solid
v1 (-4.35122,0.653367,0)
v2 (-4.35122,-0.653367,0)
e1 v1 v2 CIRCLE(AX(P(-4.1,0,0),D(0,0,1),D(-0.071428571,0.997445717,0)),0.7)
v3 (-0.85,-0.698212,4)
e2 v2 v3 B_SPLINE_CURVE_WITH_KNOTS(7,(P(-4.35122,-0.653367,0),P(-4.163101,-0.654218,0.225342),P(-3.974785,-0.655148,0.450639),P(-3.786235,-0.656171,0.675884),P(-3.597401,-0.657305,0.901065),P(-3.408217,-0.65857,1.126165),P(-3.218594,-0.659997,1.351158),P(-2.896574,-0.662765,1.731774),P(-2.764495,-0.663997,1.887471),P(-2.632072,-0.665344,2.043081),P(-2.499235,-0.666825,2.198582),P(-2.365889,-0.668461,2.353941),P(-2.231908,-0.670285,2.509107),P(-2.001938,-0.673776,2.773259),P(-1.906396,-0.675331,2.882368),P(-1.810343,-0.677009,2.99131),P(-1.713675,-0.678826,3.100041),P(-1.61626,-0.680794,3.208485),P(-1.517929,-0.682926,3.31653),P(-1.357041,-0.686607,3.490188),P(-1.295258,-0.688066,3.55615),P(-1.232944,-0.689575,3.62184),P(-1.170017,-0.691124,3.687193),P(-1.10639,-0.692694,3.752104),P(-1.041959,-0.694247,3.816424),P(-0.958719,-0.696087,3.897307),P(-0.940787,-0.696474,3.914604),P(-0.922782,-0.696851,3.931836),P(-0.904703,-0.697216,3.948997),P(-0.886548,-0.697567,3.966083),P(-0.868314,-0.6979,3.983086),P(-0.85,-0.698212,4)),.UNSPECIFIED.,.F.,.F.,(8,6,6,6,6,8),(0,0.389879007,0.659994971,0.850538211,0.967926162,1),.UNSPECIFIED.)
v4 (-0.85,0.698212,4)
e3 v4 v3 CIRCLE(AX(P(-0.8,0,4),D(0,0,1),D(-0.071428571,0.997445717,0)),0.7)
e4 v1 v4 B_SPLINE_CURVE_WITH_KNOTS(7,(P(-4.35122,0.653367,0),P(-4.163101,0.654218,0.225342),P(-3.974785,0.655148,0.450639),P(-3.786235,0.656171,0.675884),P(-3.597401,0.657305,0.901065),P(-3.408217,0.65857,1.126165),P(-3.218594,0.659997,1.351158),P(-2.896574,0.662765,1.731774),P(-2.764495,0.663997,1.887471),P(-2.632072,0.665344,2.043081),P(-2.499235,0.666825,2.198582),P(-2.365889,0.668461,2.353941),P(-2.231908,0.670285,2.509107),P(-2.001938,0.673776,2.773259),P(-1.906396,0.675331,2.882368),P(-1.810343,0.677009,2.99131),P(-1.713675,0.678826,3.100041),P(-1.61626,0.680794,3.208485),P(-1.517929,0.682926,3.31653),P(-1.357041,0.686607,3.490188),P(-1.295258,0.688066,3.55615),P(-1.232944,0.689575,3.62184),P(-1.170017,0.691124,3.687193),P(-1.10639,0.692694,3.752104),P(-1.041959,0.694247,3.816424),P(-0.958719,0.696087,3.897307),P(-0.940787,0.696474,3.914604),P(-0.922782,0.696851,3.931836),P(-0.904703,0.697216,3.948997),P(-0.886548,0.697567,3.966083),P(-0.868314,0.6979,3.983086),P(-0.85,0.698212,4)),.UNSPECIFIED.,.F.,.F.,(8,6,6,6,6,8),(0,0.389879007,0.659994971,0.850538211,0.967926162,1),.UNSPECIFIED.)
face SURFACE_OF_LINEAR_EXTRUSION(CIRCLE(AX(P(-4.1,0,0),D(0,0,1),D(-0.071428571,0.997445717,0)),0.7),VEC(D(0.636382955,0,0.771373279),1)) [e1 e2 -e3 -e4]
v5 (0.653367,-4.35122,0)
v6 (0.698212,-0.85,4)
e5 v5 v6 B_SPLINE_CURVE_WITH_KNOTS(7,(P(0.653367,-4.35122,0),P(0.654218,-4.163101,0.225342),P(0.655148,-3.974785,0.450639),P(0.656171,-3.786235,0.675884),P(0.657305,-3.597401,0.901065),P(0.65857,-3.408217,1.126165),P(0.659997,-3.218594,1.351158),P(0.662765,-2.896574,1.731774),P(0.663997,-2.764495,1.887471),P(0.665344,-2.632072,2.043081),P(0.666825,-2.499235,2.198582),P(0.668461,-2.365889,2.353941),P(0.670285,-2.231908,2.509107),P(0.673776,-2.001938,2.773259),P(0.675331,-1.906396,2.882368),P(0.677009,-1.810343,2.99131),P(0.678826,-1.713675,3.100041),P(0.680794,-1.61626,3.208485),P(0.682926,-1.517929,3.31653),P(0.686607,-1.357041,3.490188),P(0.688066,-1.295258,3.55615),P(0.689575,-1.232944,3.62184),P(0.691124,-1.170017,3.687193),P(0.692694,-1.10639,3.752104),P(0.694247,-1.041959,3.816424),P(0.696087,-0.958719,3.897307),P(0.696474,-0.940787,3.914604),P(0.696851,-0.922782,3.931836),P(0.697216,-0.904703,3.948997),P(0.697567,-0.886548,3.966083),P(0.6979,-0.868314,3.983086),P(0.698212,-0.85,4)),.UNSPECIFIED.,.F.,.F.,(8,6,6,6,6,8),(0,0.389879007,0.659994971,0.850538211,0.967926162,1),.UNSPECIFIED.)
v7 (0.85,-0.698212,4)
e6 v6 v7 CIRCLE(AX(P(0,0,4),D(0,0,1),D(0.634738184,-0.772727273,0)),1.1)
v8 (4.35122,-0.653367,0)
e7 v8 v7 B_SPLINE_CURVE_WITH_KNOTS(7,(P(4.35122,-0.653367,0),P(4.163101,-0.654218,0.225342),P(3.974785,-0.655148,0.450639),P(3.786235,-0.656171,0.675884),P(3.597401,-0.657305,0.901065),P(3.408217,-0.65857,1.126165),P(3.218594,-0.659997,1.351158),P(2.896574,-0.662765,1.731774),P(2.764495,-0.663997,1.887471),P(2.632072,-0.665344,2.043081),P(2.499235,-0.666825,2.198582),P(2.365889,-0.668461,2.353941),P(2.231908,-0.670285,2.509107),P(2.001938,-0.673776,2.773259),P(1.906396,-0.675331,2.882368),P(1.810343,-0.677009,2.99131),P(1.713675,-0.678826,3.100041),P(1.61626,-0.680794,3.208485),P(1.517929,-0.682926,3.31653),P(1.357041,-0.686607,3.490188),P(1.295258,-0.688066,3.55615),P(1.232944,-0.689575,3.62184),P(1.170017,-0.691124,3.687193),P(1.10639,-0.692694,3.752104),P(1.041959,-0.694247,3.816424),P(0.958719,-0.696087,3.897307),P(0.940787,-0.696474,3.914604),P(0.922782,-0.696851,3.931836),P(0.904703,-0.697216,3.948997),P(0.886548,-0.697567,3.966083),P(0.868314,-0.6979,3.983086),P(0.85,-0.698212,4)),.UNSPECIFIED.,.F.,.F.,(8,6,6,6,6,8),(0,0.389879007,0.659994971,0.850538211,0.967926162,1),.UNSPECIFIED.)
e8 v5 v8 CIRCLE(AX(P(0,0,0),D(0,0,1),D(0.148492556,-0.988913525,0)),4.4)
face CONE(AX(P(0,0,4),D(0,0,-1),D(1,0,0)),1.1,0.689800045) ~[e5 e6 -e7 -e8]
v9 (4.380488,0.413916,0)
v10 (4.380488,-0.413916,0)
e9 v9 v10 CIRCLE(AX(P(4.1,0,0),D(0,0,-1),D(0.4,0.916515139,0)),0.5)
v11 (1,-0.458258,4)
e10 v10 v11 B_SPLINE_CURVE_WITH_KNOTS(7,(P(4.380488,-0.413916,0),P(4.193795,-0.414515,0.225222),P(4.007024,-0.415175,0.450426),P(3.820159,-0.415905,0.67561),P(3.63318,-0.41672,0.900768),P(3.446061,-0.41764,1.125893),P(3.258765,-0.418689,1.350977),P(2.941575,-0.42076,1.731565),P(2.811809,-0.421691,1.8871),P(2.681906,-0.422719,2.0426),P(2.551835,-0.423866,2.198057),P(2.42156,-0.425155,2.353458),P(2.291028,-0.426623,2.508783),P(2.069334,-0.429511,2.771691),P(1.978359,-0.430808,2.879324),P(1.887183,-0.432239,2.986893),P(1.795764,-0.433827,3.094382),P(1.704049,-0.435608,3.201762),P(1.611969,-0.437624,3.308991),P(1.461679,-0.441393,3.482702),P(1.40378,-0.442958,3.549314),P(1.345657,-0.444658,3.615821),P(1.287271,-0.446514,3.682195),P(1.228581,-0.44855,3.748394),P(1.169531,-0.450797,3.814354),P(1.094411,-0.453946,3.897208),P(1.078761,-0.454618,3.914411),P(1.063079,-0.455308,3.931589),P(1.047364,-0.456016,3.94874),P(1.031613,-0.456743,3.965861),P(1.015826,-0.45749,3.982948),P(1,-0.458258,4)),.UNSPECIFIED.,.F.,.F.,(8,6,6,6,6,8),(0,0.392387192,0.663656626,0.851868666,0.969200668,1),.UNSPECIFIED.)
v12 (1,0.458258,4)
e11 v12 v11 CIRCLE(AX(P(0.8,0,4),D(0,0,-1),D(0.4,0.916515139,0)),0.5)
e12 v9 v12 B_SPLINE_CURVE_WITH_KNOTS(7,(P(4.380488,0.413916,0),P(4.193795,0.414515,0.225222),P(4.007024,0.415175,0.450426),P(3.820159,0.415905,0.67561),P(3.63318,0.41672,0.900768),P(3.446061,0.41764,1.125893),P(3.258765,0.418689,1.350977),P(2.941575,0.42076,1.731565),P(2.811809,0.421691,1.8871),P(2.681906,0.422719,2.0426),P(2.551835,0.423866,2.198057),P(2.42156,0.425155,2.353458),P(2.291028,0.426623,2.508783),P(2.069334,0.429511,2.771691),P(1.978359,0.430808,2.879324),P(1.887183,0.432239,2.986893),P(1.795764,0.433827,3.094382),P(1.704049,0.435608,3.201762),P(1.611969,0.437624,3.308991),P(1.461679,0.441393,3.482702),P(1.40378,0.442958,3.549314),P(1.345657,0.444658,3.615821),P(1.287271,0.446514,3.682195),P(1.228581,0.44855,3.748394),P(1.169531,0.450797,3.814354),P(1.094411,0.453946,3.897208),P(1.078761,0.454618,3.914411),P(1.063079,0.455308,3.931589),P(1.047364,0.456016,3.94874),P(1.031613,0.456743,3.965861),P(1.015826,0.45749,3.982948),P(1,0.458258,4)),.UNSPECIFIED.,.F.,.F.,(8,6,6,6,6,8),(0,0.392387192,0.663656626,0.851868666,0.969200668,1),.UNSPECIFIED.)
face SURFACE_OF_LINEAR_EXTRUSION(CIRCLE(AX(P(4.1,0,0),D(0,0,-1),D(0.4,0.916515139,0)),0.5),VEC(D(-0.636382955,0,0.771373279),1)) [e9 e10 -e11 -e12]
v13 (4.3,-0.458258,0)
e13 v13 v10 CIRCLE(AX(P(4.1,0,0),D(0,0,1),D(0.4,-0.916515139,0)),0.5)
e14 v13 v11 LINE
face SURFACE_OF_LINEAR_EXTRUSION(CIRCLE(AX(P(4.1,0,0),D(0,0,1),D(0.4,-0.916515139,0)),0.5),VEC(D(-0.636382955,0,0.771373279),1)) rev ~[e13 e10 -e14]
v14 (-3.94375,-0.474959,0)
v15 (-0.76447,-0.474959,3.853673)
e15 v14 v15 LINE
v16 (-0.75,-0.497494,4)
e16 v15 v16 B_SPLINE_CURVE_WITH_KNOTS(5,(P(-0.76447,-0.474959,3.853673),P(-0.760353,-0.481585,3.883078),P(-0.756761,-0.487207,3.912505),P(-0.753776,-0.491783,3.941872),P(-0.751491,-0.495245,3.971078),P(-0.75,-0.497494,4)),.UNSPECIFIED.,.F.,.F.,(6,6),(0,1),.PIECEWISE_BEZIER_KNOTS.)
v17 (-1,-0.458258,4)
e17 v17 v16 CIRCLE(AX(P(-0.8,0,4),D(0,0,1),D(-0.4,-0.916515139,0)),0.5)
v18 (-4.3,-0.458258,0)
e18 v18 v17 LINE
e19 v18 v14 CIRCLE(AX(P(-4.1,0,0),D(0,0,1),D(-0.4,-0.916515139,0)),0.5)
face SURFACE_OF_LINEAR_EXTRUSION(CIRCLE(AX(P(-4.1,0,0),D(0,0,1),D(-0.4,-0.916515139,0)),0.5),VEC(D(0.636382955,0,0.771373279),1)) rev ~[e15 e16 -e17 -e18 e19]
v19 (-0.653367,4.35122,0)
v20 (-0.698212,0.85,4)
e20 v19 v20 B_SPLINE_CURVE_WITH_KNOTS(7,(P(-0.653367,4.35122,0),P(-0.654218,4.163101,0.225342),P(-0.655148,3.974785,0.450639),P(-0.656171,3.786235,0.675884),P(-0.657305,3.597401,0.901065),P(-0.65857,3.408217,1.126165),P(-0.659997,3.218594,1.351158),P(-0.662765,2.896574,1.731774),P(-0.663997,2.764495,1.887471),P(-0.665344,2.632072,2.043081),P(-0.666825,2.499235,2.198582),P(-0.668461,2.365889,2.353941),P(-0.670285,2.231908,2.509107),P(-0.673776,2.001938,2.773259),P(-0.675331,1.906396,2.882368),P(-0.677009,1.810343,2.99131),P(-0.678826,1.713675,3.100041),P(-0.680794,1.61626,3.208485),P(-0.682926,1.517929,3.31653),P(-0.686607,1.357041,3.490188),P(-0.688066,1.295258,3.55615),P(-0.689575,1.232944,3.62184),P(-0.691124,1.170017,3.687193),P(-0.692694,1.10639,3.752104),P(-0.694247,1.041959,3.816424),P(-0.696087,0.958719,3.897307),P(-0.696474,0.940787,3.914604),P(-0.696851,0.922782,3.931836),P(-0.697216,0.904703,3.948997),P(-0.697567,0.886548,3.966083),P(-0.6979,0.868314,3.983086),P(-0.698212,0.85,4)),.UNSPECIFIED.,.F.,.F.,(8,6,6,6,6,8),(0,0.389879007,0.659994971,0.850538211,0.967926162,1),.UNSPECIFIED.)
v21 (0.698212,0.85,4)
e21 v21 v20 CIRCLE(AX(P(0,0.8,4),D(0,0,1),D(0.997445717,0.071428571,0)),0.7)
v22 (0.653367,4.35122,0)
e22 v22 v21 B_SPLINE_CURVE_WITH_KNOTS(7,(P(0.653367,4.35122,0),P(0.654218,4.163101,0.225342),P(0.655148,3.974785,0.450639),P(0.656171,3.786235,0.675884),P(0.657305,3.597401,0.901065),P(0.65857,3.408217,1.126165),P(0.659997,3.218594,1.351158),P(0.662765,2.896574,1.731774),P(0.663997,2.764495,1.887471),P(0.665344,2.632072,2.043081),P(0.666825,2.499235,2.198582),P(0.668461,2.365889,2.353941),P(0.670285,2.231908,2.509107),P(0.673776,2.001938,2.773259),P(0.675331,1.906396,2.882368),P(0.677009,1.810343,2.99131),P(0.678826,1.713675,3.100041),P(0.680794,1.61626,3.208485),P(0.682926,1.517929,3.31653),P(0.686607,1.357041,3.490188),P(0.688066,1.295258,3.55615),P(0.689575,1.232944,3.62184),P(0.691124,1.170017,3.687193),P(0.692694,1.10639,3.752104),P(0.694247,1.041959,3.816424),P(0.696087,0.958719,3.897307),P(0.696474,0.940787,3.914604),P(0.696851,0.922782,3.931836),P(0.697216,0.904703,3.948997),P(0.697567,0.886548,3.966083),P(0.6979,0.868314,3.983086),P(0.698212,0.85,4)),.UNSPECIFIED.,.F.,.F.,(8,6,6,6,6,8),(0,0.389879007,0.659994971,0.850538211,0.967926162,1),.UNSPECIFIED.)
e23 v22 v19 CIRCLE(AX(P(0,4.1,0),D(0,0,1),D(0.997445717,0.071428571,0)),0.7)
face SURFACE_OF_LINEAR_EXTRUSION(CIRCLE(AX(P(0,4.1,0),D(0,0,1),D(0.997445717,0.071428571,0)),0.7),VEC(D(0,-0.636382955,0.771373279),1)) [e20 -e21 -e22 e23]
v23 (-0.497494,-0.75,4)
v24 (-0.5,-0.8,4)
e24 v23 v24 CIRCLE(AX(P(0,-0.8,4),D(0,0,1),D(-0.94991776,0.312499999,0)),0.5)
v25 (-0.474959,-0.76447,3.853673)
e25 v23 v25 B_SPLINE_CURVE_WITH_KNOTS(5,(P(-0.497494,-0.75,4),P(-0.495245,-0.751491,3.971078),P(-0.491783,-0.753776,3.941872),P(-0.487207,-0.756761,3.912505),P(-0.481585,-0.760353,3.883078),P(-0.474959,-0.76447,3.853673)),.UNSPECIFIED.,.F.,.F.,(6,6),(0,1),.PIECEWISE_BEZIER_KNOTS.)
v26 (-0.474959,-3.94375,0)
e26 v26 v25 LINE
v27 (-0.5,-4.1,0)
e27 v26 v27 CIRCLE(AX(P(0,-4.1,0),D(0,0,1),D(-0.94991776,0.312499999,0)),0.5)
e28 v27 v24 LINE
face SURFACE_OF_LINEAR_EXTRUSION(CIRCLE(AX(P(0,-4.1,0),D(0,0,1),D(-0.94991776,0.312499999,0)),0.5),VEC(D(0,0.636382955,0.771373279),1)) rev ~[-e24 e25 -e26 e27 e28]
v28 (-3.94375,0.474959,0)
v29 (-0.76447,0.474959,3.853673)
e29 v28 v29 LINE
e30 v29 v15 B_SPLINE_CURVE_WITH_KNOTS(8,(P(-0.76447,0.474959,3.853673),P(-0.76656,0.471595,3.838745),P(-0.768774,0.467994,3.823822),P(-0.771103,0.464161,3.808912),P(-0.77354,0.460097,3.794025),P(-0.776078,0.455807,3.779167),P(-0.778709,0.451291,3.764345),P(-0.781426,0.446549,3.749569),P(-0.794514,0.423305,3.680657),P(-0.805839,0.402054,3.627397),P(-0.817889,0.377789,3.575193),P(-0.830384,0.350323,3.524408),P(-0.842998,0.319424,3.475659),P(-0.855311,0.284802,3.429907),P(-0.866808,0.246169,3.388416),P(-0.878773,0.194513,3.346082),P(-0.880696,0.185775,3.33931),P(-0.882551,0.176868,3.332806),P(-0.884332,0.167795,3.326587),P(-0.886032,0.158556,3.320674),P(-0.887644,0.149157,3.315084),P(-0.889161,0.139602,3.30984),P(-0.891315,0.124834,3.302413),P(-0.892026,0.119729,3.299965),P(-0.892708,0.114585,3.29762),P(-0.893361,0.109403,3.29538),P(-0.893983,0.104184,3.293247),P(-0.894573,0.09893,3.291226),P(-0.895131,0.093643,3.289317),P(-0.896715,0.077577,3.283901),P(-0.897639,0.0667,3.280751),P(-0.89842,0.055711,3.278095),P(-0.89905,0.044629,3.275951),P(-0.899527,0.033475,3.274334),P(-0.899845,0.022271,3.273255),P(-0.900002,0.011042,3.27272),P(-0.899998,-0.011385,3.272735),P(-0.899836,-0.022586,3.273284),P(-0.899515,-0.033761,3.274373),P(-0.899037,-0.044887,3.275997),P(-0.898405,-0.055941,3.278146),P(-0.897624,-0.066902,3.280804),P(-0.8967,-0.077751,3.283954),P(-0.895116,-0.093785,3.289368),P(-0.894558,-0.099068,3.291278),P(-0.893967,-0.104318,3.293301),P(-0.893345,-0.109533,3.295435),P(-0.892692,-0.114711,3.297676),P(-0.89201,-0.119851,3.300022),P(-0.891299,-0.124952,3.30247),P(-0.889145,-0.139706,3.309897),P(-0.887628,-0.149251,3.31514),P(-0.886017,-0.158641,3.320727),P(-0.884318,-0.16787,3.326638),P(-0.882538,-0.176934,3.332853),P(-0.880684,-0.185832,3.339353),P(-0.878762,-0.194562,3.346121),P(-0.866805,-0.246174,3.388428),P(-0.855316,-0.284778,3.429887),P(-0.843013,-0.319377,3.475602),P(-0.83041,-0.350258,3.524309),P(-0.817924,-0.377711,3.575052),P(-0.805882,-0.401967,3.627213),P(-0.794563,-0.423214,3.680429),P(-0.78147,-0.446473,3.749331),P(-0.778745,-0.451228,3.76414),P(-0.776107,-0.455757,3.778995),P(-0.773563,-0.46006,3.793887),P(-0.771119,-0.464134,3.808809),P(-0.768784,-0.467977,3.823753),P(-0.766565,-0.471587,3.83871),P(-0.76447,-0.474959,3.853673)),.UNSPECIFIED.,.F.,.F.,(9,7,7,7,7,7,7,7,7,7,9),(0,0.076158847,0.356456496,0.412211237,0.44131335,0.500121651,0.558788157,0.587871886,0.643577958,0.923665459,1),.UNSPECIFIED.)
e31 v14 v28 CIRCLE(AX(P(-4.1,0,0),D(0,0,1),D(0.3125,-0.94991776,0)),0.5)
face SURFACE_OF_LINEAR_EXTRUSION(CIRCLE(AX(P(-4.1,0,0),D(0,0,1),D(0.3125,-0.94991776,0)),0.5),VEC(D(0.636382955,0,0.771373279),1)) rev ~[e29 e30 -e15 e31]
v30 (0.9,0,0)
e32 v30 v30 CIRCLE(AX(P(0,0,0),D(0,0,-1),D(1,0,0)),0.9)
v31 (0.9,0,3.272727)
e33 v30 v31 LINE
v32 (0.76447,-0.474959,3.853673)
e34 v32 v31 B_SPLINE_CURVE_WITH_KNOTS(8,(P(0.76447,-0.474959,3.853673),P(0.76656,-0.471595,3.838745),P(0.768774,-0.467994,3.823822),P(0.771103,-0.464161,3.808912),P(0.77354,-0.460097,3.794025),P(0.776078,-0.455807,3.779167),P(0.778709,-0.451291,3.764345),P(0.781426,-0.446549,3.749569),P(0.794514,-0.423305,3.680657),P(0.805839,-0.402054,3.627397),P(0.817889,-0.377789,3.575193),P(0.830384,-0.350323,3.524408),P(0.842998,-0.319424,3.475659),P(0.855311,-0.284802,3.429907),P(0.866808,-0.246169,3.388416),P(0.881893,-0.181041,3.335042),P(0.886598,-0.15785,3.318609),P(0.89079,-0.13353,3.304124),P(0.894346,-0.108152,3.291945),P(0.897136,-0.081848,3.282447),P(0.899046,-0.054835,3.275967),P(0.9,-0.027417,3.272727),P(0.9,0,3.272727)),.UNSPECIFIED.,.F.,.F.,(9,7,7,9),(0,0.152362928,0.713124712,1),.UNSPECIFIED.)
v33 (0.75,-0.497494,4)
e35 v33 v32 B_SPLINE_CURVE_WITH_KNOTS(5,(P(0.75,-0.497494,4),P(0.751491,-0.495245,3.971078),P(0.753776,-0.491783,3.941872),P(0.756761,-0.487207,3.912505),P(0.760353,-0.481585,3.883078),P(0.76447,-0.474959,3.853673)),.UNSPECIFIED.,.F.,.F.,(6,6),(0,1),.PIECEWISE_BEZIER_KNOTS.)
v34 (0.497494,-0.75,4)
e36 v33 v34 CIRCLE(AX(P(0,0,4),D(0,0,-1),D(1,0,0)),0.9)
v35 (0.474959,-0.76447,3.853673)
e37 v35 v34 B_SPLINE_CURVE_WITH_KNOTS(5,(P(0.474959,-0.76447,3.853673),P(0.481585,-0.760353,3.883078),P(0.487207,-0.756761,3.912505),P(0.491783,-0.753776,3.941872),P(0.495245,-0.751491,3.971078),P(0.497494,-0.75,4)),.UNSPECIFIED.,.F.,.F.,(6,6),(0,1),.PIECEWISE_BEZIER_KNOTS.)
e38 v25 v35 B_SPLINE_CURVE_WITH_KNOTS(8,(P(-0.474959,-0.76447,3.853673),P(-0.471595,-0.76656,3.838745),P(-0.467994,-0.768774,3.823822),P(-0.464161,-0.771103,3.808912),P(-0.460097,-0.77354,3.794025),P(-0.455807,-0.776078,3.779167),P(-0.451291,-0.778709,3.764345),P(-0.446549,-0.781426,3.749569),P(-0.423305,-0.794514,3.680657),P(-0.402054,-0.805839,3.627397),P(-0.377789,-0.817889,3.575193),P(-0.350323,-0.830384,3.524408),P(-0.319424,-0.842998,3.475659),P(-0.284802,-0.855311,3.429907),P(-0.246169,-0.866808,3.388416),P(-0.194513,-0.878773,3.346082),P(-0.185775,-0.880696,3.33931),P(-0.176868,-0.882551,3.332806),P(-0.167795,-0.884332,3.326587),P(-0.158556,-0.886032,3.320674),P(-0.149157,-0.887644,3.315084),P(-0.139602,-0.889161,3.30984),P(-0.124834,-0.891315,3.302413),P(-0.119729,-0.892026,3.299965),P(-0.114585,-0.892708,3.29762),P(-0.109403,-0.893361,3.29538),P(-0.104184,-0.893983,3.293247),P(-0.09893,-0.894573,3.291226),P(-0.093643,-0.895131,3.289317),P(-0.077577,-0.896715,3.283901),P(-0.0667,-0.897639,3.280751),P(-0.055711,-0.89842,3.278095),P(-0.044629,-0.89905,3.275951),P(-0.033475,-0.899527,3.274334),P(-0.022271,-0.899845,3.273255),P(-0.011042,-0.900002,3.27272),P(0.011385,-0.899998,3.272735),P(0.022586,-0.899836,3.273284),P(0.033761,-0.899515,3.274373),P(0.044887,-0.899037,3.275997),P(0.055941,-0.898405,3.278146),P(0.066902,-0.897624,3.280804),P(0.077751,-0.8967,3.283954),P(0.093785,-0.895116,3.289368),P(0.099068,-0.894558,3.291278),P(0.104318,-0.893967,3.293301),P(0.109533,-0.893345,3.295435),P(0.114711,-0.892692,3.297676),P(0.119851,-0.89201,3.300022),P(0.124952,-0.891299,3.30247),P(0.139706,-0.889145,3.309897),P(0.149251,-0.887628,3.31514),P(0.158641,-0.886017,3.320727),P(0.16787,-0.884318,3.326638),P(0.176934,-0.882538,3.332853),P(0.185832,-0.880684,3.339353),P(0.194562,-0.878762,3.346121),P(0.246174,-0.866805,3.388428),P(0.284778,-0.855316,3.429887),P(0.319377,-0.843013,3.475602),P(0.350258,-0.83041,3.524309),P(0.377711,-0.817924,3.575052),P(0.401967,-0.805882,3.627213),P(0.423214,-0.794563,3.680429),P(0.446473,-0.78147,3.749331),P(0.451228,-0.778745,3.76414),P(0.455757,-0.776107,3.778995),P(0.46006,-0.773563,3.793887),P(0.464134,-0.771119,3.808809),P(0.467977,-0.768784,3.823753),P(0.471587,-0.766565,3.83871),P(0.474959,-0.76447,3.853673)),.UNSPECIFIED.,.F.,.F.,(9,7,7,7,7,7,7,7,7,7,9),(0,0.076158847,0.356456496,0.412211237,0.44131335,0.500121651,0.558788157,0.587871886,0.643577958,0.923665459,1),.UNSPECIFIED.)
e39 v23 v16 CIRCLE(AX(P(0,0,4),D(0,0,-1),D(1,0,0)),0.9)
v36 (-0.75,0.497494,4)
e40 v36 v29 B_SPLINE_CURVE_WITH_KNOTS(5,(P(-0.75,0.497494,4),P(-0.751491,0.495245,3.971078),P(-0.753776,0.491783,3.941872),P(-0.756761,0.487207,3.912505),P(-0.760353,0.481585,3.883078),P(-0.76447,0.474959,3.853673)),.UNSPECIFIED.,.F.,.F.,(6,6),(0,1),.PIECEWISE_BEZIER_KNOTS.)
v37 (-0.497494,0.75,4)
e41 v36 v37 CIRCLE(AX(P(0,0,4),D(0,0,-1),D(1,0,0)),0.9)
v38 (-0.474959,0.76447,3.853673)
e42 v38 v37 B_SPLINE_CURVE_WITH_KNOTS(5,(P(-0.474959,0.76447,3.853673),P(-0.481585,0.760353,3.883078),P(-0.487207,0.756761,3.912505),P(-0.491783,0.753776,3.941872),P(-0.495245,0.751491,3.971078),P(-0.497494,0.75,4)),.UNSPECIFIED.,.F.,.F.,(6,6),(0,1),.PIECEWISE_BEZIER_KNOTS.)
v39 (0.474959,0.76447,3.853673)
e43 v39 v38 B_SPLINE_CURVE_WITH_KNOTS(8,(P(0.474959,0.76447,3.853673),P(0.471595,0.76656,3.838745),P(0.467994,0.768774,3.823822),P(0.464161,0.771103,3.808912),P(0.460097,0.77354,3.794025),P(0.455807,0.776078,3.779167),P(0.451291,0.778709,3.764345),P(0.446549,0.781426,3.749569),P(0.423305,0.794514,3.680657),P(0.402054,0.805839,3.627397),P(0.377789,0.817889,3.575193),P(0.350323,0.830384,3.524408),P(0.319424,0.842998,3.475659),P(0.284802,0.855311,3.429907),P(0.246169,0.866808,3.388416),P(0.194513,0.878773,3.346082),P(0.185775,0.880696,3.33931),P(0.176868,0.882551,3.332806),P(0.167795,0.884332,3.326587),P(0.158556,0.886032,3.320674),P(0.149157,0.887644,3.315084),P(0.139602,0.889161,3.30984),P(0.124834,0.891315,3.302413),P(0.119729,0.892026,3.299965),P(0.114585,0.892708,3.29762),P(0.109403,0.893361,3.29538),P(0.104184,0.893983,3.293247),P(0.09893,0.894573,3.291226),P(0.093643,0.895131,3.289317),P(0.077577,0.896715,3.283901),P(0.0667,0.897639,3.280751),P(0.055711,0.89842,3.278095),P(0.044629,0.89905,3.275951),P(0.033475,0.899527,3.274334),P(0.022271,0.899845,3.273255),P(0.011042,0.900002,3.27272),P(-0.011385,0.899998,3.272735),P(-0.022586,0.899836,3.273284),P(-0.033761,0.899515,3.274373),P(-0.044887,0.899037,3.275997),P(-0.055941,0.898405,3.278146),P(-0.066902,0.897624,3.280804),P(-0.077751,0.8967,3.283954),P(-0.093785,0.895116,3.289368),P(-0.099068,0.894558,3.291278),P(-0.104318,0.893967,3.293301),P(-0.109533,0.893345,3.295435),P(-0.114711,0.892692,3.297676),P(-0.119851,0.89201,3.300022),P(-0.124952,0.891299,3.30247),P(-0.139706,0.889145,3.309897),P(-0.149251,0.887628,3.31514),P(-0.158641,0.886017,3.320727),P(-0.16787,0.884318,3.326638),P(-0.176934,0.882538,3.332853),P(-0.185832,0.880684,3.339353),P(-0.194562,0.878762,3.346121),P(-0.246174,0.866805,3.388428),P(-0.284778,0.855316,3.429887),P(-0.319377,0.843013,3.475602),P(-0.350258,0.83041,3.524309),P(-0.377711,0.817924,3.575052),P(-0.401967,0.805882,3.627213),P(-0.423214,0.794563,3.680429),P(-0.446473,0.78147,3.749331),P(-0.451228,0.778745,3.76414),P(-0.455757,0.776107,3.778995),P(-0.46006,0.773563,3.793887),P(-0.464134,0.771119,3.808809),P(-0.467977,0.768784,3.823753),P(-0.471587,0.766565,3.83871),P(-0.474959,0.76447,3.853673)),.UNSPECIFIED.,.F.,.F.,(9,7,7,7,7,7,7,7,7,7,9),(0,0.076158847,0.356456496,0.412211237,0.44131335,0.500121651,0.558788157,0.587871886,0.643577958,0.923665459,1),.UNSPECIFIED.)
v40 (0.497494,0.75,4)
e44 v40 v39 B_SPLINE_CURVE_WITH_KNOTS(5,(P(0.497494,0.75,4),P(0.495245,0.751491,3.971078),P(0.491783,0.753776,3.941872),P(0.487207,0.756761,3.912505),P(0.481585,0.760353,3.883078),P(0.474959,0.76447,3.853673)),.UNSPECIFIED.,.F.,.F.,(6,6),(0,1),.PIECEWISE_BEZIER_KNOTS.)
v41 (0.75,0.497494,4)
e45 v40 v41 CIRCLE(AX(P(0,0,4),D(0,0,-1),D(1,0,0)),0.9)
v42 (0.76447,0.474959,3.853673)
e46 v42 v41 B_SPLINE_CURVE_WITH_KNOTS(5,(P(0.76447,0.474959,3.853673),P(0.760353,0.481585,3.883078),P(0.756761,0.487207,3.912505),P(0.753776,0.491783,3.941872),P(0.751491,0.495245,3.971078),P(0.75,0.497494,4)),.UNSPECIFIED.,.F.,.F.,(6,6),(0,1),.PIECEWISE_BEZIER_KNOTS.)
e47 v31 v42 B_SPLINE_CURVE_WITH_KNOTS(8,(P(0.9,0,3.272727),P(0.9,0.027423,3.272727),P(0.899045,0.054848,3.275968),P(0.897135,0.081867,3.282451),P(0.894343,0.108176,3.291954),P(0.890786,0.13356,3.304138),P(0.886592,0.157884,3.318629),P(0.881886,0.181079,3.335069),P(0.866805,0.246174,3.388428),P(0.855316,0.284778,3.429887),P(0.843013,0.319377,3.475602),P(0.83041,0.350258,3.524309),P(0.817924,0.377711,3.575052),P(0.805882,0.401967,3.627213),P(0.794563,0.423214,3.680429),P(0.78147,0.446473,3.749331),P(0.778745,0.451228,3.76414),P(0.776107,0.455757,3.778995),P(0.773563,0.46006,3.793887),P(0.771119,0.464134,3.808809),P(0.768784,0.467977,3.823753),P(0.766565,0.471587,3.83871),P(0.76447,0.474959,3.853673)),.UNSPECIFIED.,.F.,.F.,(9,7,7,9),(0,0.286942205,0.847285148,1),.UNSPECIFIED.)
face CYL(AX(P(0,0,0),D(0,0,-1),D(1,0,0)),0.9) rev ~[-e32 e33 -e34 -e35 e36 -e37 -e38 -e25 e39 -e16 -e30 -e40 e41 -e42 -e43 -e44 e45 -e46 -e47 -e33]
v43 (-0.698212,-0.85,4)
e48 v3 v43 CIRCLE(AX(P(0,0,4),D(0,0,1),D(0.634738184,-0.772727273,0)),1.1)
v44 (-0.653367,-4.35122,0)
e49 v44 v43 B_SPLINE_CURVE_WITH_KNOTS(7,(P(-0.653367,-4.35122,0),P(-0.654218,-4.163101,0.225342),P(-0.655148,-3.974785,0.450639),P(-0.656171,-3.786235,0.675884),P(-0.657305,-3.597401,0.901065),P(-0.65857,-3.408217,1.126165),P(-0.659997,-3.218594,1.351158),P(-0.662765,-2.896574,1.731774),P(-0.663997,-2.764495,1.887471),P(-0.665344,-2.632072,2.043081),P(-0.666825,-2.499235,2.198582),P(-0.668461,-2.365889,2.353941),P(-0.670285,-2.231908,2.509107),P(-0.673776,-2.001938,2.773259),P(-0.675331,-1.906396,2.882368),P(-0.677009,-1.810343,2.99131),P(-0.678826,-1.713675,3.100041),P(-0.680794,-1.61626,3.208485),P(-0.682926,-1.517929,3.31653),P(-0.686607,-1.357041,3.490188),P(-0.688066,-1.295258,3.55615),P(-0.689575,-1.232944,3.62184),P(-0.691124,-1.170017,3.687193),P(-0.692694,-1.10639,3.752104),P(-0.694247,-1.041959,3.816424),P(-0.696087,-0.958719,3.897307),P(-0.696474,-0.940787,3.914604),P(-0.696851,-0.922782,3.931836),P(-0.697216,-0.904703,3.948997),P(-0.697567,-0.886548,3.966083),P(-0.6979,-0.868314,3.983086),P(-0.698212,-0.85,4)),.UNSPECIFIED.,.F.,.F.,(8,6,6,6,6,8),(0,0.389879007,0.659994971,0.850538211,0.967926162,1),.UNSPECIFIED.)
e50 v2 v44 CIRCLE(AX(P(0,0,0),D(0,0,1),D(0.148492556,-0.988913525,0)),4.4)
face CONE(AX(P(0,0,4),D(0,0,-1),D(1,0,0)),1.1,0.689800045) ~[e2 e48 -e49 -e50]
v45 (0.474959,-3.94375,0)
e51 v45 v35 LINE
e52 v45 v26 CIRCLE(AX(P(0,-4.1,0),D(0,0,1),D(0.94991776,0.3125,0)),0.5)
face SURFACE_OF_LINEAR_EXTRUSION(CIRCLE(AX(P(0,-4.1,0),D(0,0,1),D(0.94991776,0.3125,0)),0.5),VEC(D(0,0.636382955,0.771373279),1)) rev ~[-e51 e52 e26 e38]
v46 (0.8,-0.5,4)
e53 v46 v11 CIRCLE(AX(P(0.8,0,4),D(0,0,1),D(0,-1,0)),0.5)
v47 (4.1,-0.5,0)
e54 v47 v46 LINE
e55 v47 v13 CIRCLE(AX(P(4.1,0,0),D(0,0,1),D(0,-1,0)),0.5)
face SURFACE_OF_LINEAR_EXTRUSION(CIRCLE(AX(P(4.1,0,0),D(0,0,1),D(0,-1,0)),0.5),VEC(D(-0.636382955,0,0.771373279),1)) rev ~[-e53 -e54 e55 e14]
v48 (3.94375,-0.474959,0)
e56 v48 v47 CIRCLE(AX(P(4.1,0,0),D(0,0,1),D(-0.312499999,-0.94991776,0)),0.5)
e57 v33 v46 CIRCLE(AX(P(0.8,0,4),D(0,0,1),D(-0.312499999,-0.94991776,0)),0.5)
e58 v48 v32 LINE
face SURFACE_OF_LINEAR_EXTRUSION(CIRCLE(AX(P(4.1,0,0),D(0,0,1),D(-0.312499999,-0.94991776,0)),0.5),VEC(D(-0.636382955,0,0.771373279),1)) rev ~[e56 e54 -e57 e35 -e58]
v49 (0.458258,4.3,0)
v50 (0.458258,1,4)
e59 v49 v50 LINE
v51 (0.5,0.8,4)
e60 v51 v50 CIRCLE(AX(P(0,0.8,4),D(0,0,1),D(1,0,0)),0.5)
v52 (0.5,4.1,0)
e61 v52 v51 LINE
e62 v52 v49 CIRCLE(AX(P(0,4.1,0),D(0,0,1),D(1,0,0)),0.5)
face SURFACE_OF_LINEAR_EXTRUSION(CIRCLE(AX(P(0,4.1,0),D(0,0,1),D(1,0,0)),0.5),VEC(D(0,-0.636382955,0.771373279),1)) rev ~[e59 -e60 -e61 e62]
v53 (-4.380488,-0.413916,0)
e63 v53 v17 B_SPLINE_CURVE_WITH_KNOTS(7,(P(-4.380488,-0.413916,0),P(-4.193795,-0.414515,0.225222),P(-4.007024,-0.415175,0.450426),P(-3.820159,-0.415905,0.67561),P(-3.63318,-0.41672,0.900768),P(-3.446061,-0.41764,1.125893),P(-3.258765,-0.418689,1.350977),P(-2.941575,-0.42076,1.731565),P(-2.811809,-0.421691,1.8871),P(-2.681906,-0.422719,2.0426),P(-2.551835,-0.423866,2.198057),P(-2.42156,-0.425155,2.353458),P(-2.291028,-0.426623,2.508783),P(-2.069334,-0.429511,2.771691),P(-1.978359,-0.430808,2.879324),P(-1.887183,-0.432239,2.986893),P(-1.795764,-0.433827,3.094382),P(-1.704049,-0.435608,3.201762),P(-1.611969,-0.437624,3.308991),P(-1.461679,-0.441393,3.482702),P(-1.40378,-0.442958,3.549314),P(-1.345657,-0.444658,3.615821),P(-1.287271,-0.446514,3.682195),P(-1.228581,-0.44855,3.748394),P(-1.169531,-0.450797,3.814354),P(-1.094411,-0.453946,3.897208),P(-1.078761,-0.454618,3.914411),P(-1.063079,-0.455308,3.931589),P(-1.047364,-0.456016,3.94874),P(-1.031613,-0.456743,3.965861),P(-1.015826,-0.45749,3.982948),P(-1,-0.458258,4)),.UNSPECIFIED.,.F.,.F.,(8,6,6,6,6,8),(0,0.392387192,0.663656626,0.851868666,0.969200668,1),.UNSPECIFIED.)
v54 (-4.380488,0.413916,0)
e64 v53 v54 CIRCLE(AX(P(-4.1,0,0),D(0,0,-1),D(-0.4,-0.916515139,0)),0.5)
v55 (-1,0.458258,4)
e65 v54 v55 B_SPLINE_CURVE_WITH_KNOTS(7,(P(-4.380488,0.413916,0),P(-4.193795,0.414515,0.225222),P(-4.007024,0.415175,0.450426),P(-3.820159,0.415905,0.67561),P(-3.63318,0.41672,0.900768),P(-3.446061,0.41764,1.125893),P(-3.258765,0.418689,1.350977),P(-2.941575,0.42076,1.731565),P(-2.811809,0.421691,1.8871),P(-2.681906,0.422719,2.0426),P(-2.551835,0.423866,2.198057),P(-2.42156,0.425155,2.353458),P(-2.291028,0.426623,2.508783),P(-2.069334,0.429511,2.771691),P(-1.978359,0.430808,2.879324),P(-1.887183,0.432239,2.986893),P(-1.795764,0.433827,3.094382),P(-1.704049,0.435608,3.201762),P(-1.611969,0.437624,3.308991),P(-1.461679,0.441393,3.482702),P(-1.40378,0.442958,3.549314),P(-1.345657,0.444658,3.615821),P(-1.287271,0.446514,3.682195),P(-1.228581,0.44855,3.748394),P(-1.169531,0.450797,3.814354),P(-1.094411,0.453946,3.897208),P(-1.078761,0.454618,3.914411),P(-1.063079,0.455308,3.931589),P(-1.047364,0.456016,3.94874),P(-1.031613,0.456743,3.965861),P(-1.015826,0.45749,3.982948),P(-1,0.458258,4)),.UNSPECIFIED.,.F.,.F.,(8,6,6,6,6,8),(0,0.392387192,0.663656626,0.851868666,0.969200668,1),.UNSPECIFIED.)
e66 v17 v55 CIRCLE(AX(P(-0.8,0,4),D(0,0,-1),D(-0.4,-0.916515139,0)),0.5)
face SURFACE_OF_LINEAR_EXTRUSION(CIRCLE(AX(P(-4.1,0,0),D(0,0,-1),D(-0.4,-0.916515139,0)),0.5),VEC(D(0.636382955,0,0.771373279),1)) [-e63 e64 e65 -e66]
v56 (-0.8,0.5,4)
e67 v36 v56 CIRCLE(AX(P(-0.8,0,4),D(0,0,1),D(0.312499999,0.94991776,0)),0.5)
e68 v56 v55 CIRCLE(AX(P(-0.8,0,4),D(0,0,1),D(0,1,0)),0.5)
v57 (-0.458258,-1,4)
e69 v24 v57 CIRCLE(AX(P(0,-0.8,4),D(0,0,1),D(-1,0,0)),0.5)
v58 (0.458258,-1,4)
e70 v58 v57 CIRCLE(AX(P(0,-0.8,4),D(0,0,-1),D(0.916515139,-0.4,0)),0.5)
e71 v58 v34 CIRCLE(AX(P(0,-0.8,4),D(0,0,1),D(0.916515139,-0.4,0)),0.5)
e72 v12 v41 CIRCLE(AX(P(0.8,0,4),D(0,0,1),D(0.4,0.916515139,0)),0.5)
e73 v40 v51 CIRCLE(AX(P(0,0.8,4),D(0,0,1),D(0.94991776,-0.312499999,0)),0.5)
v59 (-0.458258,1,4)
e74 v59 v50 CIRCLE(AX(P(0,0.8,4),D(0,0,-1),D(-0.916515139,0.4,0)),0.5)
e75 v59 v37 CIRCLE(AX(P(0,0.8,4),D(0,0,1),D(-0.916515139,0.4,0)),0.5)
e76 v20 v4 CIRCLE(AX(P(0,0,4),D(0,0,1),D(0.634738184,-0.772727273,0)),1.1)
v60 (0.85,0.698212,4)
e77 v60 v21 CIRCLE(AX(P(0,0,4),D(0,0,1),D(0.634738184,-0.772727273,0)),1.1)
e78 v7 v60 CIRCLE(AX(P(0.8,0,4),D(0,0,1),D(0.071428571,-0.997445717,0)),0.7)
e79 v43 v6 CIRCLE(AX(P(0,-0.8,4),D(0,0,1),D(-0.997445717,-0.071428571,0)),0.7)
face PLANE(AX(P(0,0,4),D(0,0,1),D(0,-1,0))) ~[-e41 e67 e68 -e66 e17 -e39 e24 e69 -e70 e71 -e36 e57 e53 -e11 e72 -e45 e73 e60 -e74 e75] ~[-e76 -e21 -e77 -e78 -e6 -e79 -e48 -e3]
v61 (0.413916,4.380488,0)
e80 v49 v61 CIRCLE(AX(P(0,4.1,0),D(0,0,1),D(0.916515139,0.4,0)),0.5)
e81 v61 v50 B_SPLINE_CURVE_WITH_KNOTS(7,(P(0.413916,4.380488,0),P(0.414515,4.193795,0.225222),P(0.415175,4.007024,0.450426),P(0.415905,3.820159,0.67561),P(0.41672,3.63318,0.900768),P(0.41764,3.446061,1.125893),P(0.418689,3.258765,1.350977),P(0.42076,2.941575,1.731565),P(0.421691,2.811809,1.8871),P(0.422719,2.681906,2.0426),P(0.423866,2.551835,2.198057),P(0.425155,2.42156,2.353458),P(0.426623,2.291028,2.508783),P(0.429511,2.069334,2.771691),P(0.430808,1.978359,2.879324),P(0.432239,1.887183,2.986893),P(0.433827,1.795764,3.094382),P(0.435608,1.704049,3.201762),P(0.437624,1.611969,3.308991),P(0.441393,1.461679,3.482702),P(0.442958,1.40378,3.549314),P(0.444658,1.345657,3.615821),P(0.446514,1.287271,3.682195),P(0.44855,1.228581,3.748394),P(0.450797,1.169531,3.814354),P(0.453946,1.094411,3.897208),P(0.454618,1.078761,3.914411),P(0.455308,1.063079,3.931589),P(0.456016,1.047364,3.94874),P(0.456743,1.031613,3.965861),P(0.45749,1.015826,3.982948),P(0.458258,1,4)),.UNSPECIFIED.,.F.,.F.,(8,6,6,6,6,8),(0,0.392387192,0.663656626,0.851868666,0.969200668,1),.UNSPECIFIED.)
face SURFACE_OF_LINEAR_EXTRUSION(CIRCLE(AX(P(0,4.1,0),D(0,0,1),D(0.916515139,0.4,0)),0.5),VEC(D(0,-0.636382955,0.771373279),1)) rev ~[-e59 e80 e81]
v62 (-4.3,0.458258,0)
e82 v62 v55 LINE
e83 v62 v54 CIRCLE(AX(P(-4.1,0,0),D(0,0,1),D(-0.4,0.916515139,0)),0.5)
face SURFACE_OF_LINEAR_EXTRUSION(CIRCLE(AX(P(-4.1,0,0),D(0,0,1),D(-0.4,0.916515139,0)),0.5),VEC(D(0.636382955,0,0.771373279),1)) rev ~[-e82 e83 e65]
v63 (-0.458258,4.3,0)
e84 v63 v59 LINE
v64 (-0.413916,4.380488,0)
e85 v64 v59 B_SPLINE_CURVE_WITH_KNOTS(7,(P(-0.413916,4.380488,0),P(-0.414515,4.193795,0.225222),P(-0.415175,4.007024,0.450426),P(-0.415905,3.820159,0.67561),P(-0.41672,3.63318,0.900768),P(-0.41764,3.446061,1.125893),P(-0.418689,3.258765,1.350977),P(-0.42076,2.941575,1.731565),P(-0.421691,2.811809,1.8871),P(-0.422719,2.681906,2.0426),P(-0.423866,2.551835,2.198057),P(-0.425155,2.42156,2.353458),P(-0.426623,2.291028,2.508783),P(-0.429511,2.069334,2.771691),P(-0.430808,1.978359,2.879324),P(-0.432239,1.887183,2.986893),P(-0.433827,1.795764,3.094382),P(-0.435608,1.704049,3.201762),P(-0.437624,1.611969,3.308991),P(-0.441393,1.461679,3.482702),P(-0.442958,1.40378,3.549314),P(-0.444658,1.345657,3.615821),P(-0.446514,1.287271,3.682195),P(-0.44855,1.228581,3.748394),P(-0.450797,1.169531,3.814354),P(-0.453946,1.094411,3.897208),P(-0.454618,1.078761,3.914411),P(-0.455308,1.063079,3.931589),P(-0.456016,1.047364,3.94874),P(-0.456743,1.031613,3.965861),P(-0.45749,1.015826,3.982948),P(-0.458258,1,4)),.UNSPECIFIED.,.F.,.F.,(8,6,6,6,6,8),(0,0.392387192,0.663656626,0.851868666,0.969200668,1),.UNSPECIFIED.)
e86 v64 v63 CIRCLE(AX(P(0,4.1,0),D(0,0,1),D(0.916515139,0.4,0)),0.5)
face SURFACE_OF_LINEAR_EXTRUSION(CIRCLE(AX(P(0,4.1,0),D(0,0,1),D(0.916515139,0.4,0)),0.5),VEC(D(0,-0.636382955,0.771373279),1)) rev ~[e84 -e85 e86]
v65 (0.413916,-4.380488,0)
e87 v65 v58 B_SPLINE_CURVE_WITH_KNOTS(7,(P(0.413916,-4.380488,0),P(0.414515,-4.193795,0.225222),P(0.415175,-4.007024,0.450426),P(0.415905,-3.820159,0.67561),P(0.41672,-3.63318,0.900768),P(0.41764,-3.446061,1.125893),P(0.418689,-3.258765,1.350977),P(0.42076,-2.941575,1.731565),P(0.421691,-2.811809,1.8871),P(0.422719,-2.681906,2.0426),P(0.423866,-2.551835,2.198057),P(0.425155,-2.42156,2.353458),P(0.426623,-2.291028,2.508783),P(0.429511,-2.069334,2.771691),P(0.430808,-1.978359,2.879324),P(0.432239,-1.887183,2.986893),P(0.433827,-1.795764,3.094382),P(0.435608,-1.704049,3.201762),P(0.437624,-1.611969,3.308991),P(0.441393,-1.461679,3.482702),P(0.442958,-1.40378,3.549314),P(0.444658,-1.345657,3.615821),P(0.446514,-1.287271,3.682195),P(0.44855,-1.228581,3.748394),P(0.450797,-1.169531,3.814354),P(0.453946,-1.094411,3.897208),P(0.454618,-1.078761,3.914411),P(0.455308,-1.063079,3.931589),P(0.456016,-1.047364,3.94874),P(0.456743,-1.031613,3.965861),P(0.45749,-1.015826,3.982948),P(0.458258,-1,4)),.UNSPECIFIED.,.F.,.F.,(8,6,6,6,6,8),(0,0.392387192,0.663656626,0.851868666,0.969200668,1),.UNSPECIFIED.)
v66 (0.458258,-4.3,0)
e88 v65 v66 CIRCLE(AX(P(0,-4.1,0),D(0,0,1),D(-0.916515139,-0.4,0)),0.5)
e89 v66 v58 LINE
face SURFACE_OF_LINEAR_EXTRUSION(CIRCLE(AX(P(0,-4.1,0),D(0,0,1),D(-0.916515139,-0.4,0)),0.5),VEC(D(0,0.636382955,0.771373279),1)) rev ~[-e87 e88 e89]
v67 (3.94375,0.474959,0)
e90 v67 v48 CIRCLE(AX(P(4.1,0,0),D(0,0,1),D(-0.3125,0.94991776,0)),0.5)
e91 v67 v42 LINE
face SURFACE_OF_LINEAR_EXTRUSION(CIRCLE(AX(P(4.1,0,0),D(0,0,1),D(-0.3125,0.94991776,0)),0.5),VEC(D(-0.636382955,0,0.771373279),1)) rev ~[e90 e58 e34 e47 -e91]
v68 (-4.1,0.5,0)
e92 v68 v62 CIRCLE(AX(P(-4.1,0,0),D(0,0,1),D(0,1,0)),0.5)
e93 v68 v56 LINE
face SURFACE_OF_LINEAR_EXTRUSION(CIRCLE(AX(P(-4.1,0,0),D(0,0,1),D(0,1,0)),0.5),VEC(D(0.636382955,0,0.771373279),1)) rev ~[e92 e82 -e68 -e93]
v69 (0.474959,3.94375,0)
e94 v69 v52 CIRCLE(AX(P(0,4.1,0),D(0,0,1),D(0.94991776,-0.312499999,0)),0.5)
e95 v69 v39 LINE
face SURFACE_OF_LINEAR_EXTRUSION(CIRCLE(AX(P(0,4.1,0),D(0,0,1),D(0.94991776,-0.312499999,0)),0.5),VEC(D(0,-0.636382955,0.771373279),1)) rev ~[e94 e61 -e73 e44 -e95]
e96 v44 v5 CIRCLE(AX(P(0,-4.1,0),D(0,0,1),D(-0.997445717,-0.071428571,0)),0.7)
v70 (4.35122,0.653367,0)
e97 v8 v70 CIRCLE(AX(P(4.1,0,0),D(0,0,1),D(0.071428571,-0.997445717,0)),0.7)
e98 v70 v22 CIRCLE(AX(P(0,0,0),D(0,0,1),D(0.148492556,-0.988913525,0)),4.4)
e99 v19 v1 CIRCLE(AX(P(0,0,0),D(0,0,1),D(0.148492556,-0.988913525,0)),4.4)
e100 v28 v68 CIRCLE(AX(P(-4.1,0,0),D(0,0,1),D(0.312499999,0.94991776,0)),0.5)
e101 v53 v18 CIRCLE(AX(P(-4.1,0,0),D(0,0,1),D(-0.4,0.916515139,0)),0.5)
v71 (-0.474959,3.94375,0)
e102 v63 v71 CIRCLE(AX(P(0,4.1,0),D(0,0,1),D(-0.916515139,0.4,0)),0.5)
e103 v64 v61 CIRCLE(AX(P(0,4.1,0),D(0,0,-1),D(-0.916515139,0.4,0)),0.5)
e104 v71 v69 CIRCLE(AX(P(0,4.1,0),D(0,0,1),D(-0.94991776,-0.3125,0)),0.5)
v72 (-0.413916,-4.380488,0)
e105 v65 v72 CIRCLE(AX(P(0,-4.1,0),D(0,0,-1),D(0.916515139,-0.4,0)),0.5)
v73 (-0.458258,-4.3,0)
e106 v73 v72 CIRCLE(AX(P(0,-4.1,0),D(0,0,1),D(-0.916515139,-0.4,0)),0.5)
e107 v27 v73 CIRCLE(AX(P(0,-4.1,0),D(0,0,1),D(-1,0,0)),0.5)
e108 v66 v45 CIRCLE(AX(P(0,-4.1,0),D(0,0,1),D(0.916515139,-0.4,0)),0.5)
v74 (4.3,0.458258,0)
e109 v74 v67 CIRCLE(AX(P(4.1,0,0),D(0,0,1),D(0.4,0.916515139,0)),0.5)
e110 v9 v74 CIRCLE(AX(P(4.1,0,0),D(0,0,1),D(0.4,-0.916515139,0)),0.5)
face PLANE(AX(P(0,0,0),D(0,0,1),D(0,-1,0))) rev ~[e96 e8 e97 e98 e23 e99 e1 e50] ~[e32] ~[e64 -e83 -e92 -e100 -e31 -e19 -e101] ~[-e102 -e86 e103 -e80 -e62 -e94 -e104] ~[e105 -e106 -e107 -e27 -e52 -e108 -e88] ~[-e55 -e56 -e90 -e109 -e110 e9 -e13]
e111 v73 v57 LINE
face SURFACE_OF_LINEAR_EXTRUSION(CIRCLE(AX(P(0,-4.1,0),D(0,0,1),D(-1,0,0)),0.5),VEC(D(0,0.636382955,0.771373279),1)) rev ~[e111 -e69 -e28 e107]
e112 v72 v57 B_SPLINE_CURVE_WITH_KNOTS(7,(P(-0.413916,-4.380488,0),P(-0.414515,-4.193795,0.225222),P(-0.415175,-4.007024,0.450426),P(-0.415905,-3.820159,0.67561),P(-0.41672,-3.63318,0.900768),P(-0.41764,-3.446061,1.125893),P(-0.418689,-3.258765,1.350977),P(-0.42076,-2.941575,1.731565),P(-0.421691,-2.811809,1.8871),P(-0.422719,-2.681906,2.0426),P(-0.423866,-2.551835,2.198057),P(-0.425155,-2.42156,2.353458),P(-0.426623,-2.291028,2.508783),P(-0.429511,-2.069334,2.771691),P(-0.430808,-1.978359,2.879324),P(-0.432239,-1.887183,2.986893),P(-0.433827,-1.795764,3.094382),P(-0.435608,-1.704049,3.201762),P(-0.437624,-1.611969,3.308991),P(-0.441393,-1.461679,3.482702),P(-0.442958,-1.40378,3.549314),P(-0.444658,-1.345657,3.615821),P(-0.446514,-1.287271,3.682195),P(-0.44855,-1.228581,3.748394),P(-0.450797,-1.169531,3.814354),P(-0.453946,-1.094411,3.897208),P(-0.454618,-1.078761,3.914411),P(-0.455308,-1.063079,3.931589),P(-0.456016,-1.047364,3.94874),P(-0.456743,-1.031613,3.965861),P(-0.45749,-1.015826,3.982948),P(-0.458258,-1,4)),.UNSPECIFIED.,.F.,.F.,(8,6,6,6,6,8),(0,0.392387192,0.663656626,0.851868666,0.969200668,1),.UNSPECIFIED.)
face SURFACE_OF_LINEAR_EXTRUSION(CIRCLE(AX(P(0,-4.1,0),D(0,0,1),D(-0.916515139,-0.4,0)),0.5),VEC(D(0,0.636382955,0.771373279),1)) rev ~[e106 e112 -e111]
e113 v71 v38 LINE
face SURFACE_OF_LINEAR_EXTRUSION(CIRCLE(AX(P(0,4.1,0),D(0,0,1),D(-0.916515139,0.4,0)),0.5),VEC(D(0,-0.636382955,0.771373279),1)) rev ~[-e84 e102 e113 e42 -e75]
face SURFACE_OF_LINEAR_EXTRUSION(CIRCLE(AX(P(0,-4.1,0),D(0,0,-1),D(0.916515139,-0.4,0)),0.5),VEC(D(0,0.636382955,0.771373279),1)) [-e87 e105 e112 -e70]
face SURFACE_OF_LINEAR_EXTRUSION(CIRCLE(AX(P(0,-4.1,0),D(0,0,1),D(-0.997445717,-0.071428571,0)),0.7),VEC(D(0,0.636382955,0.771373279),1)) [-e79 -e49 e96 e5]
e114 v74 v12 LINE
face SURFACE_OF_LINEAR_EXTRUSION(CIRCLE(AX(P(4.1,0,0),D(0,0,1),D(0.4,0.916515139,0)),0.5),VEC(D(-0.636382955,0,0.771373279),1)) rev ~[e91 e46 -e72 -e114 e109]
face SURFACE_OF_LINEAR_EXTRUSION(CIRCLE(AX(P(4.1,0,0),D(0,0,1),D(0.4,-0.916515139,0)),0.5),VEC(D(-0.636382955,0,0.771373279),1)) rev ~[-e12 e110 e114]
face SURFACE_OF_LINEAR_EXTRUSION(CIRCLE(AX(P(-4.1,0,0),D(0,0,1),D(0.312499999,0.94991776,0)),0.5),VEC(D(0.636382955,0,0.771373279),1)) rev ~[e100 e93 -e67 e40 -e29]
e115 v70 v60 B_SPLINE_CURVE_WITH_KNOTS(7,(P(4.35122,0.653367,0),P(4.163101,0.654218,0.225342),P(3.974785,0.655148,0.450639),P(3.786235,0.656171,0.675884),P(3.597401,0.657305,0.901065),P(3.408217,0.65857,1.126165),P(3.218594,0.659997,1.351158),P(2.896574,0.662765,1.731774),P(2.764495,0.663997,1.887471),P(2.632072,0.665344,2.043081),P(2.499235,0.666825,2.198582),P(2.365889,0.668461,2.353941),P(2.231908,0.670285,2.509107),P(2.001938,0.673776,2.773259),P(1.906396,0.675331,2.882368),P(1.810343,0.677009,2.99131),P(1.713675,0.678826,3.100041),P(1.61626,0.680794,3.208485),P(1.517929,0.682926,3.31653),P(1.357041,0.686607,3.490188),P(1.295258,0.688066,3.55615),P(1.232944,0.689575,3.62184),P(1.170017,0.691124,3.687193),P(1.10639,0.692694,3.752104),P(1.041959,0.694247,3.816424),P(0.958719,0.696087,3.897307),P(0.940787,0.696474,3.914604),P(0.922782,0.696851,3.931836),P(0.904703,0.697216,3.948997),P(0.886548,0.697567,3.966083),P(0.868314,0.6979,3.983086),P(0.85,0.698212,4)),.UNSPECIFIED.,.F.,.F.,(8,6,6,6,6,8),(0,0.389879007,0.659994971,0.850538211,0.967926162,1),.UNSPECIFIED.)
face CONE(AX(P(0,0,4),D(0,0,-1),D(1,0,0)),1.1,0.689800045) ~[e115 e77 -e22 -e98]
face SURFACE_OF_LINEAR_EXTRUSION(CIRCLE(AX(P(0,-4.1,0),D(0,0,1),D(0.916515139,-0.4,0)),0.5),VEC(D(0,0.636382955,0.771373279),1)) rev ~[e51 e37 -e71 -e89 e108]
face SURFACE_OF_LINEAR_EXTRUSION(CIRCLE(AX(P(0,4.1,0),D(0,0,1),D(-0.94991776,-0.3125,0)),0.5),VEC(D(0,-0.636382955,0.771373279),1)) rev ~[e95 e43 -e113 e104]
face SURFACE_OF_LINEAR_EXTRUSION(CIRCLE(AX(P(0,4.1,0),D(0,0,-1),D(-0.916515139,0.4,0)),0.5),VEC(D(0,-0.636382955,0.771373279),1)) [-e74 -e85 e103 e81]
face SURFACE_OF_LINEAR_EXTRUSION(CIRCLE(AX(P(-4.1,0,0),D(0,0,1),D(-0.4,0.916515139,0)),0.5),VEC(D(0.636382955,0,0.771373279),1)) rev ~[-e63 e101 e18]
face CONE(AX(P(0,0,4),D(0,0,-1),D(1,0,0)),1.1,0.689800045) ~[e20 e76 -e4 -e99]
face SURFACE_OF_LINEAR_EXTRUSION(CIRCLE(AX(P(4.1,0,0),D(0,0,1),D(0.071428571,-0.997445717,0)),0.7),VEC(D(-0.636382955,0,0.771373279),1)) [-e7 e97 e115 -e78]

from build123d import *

# Parameters (mm, degrees)
F7_COUNT  = 4
F8_COUNT  = 4
F10_R     = 0.9
F11_DEPTH = 4


with BuildPart() as f1:
    # F0 (on Front) → F1 (revolve)
    with BuildSketch(Plane.XZ):
        Polygon((-0.8, 0), (-0.8, 4), (-1.1, 4), (-4.4, 0), align=None)
    revolve(axis=Axis((0, 0, 2), (0, 0, 1)))

    # F5: sweep along a path in F4
    with BuildLine(Plane(origin=(0, 0, 0), x_dir=(0, -1, 0), z_dir=(-1, 0, 0))) as f5_path:
        Line((-4.4, 0), (-1.1, 4))
    # F2 (on face) → F5 (sweep)
    with BuildSketch(Plane.XY.offset(4)):
        with BuildLine():
            ThreePointArc((0.4582575695, 1), (0.5830784403, 0.9327483757), (0.6982120022, 0.85))
            ThreePointArc((0.6982120022, 0.85), (0, 1.5), (-0.6982120022, 0.85))
            ThreePointArc((-0.6982120022, 0.85), (-0.5830784403, 0.9327483757), (-0.4582575695, 1))
            ThreePointArc((-0.4582575695, 1), (0, 1.3), (0.4582575695, 1))
        make_face()
        with BuildLine():
            ThreePointArc((-0.4582575695, 1), (-0.5830784403, 0.9327483757), (-0.6982120022, 0.85))
            ThreePointArc((-0.6982120022, 0.85), (-0.6873150882, 0.667342661), (-0.6294528874, 0.49375))
            ThreePointArc((-0.6294528874, 0.49375), (-0.5572758185, 0.5739718304), (-0.4749588798, 0.64375))
            ThreePointArc((-0.4749588798, 0.64375), (-0.49945145, 0.823414719), (-0.4582575695, 1))
        make_face()
        with BuildLine():
            ThreePointArc((-0.6294528874, 0.49375), (0, 0.1), (0.6294528874, 0.49375))
            ThreePointArc((0.6294528874, 0.49375), (0.5572758185, 0.5739718304), (0.4749588798, 0.64375))
            ThreePointArc((0.4749588798, 0.64375), (0, 0.3), (-0.4749588798, 0.64375))
            ThreePointArc((-0.4749588798, 0.64375), (-0.5572758185, 0.5739718304), (-0.6294528874, 0.49375))
        make_face()
        with BuildLine():
            ThreePointArc((0.6294528874, 0.49375), (0.6821352583, 0.6428647417), (0.7, 0.8))
            ThreePointArc((0.7, 0.8), (0.6995528577, 0.8250159796), (0.6982120022, 0.85))
            ThreePointArc((0.6982120022, 0.85), (0.5830784403, 0.9327483757), (0.4582575695, 1))
            ThreePointArc((0.4582575695, 1), (0.4894531565, 0.9021548218), (0.5, 0.8))
            ThreePointArc((0.5, 0.8), (0.4937000303, 0.7208780685), (0.4749588798, 0.64375))
            ThreePointArc((0.4749588798, 0.64375), (0.5572758185, 0.5739718304), (0.6294528874, 0.49375))
        make_face()
    sweep(path=f5_path.line)

    # F6: sweep along a path in F4
    with BuildLine(Plane(origin=(0, 0, 0), x_dir=(0, -1, 0), z_dir=(-1, 0, 0))) as f6_path:
        Line((-4.4, 0), (-1.1, 4))
    # F2 (on face) → F6 (sweep, cut)
    with BuildSketch(Plane.XY.offset(4)):
        with BuildLine():
            ThreePointArc((-0.4582575695, 1), (0, 1.1), (0.4582575695, 1))
            ThreePointArc((0.4582575695, 1), (0, 1.3), (-0.4582575695, 1))
        make_face()
        with BuildLine():
            ThreePointArc((-0.4749588798, 0.64375), (0, 0.3), (0.4749588798, 0.64375))
            ThreePointArc((0.4749588798, 0.64375), (0, 0.8), (-0.4749588798, 0.64375))
        make_face()
        with BuildLine():
            ThreePointArc((0.5, 0.8), (0.4894531565, 0.9021548218), (0.4582575695, 1))
            ThreePointArc((0.4582575695, 1), (0, 1.1), (-0.4582575695, 1))
            ThreePointArc((-0.4582575695, 1), (-0.49945145, 0.823414719), (-0.4749588798, 0.64375))
            ThreePointArc((-0.4749588798, 0.64375), (0, 0.8), (0.4749588798, 0.64375))
            ThreePointArc((0.4749588798, 0.64375), (0.4937000303, 0.7208780685), (0.5, 0.8))
        make_face()
    f6 = sweep(path=f6_path.line, mode=Mode.SUBTRACT)

    # F7: F6 ×4 about axis
    f7_axis = Axis((0, 0, 4), (0, 0, -1))
    for i in range(1, F7_COUNT):
        add(f6.rotate(f7_axis, i * 360 / F7_COUNT), mode=Mode.SUBTRACT)


with BuildPart() as f8_1:
    # F8: instance of F1
    add(f1.part.rotate(Axis((0, 0, 0), (0, 0, 1)), 1 * 360 / F8_COUNT))


with BuildPart() as f8_2:
    # F8: instance of F1
    add(f1.part.rotate(Axis((0, 0, 0), (0, 0, 1)), 2 * 360 / F8_COUNT))


with BuildPart() as f8_3:
    # F8: instance of F1
    add(f1.part.rotate(Axis((0, 0, 0), (0, 0, 1)), 3 * 360 / F8_COUNT))


with BuildPart() as f8_2_1:
    add(f8_2.part)

    # F9: union F8_3, F1, F8_1
    add(f8_3.part)
    add(f1.part)
    add(f8_1.part)

    # F10 (on face) → F11 (cut)
    with BuildSketch(Plane(origin=(0, 0, 0), x_dir=(1, 0, 0), z_dir=(0, 0, -1))):
        Circle(F10_R)
    extrude(amount=-F11_DEPTH, mode=Mode.SUBTRACT)


solid = f8_2_1.part
